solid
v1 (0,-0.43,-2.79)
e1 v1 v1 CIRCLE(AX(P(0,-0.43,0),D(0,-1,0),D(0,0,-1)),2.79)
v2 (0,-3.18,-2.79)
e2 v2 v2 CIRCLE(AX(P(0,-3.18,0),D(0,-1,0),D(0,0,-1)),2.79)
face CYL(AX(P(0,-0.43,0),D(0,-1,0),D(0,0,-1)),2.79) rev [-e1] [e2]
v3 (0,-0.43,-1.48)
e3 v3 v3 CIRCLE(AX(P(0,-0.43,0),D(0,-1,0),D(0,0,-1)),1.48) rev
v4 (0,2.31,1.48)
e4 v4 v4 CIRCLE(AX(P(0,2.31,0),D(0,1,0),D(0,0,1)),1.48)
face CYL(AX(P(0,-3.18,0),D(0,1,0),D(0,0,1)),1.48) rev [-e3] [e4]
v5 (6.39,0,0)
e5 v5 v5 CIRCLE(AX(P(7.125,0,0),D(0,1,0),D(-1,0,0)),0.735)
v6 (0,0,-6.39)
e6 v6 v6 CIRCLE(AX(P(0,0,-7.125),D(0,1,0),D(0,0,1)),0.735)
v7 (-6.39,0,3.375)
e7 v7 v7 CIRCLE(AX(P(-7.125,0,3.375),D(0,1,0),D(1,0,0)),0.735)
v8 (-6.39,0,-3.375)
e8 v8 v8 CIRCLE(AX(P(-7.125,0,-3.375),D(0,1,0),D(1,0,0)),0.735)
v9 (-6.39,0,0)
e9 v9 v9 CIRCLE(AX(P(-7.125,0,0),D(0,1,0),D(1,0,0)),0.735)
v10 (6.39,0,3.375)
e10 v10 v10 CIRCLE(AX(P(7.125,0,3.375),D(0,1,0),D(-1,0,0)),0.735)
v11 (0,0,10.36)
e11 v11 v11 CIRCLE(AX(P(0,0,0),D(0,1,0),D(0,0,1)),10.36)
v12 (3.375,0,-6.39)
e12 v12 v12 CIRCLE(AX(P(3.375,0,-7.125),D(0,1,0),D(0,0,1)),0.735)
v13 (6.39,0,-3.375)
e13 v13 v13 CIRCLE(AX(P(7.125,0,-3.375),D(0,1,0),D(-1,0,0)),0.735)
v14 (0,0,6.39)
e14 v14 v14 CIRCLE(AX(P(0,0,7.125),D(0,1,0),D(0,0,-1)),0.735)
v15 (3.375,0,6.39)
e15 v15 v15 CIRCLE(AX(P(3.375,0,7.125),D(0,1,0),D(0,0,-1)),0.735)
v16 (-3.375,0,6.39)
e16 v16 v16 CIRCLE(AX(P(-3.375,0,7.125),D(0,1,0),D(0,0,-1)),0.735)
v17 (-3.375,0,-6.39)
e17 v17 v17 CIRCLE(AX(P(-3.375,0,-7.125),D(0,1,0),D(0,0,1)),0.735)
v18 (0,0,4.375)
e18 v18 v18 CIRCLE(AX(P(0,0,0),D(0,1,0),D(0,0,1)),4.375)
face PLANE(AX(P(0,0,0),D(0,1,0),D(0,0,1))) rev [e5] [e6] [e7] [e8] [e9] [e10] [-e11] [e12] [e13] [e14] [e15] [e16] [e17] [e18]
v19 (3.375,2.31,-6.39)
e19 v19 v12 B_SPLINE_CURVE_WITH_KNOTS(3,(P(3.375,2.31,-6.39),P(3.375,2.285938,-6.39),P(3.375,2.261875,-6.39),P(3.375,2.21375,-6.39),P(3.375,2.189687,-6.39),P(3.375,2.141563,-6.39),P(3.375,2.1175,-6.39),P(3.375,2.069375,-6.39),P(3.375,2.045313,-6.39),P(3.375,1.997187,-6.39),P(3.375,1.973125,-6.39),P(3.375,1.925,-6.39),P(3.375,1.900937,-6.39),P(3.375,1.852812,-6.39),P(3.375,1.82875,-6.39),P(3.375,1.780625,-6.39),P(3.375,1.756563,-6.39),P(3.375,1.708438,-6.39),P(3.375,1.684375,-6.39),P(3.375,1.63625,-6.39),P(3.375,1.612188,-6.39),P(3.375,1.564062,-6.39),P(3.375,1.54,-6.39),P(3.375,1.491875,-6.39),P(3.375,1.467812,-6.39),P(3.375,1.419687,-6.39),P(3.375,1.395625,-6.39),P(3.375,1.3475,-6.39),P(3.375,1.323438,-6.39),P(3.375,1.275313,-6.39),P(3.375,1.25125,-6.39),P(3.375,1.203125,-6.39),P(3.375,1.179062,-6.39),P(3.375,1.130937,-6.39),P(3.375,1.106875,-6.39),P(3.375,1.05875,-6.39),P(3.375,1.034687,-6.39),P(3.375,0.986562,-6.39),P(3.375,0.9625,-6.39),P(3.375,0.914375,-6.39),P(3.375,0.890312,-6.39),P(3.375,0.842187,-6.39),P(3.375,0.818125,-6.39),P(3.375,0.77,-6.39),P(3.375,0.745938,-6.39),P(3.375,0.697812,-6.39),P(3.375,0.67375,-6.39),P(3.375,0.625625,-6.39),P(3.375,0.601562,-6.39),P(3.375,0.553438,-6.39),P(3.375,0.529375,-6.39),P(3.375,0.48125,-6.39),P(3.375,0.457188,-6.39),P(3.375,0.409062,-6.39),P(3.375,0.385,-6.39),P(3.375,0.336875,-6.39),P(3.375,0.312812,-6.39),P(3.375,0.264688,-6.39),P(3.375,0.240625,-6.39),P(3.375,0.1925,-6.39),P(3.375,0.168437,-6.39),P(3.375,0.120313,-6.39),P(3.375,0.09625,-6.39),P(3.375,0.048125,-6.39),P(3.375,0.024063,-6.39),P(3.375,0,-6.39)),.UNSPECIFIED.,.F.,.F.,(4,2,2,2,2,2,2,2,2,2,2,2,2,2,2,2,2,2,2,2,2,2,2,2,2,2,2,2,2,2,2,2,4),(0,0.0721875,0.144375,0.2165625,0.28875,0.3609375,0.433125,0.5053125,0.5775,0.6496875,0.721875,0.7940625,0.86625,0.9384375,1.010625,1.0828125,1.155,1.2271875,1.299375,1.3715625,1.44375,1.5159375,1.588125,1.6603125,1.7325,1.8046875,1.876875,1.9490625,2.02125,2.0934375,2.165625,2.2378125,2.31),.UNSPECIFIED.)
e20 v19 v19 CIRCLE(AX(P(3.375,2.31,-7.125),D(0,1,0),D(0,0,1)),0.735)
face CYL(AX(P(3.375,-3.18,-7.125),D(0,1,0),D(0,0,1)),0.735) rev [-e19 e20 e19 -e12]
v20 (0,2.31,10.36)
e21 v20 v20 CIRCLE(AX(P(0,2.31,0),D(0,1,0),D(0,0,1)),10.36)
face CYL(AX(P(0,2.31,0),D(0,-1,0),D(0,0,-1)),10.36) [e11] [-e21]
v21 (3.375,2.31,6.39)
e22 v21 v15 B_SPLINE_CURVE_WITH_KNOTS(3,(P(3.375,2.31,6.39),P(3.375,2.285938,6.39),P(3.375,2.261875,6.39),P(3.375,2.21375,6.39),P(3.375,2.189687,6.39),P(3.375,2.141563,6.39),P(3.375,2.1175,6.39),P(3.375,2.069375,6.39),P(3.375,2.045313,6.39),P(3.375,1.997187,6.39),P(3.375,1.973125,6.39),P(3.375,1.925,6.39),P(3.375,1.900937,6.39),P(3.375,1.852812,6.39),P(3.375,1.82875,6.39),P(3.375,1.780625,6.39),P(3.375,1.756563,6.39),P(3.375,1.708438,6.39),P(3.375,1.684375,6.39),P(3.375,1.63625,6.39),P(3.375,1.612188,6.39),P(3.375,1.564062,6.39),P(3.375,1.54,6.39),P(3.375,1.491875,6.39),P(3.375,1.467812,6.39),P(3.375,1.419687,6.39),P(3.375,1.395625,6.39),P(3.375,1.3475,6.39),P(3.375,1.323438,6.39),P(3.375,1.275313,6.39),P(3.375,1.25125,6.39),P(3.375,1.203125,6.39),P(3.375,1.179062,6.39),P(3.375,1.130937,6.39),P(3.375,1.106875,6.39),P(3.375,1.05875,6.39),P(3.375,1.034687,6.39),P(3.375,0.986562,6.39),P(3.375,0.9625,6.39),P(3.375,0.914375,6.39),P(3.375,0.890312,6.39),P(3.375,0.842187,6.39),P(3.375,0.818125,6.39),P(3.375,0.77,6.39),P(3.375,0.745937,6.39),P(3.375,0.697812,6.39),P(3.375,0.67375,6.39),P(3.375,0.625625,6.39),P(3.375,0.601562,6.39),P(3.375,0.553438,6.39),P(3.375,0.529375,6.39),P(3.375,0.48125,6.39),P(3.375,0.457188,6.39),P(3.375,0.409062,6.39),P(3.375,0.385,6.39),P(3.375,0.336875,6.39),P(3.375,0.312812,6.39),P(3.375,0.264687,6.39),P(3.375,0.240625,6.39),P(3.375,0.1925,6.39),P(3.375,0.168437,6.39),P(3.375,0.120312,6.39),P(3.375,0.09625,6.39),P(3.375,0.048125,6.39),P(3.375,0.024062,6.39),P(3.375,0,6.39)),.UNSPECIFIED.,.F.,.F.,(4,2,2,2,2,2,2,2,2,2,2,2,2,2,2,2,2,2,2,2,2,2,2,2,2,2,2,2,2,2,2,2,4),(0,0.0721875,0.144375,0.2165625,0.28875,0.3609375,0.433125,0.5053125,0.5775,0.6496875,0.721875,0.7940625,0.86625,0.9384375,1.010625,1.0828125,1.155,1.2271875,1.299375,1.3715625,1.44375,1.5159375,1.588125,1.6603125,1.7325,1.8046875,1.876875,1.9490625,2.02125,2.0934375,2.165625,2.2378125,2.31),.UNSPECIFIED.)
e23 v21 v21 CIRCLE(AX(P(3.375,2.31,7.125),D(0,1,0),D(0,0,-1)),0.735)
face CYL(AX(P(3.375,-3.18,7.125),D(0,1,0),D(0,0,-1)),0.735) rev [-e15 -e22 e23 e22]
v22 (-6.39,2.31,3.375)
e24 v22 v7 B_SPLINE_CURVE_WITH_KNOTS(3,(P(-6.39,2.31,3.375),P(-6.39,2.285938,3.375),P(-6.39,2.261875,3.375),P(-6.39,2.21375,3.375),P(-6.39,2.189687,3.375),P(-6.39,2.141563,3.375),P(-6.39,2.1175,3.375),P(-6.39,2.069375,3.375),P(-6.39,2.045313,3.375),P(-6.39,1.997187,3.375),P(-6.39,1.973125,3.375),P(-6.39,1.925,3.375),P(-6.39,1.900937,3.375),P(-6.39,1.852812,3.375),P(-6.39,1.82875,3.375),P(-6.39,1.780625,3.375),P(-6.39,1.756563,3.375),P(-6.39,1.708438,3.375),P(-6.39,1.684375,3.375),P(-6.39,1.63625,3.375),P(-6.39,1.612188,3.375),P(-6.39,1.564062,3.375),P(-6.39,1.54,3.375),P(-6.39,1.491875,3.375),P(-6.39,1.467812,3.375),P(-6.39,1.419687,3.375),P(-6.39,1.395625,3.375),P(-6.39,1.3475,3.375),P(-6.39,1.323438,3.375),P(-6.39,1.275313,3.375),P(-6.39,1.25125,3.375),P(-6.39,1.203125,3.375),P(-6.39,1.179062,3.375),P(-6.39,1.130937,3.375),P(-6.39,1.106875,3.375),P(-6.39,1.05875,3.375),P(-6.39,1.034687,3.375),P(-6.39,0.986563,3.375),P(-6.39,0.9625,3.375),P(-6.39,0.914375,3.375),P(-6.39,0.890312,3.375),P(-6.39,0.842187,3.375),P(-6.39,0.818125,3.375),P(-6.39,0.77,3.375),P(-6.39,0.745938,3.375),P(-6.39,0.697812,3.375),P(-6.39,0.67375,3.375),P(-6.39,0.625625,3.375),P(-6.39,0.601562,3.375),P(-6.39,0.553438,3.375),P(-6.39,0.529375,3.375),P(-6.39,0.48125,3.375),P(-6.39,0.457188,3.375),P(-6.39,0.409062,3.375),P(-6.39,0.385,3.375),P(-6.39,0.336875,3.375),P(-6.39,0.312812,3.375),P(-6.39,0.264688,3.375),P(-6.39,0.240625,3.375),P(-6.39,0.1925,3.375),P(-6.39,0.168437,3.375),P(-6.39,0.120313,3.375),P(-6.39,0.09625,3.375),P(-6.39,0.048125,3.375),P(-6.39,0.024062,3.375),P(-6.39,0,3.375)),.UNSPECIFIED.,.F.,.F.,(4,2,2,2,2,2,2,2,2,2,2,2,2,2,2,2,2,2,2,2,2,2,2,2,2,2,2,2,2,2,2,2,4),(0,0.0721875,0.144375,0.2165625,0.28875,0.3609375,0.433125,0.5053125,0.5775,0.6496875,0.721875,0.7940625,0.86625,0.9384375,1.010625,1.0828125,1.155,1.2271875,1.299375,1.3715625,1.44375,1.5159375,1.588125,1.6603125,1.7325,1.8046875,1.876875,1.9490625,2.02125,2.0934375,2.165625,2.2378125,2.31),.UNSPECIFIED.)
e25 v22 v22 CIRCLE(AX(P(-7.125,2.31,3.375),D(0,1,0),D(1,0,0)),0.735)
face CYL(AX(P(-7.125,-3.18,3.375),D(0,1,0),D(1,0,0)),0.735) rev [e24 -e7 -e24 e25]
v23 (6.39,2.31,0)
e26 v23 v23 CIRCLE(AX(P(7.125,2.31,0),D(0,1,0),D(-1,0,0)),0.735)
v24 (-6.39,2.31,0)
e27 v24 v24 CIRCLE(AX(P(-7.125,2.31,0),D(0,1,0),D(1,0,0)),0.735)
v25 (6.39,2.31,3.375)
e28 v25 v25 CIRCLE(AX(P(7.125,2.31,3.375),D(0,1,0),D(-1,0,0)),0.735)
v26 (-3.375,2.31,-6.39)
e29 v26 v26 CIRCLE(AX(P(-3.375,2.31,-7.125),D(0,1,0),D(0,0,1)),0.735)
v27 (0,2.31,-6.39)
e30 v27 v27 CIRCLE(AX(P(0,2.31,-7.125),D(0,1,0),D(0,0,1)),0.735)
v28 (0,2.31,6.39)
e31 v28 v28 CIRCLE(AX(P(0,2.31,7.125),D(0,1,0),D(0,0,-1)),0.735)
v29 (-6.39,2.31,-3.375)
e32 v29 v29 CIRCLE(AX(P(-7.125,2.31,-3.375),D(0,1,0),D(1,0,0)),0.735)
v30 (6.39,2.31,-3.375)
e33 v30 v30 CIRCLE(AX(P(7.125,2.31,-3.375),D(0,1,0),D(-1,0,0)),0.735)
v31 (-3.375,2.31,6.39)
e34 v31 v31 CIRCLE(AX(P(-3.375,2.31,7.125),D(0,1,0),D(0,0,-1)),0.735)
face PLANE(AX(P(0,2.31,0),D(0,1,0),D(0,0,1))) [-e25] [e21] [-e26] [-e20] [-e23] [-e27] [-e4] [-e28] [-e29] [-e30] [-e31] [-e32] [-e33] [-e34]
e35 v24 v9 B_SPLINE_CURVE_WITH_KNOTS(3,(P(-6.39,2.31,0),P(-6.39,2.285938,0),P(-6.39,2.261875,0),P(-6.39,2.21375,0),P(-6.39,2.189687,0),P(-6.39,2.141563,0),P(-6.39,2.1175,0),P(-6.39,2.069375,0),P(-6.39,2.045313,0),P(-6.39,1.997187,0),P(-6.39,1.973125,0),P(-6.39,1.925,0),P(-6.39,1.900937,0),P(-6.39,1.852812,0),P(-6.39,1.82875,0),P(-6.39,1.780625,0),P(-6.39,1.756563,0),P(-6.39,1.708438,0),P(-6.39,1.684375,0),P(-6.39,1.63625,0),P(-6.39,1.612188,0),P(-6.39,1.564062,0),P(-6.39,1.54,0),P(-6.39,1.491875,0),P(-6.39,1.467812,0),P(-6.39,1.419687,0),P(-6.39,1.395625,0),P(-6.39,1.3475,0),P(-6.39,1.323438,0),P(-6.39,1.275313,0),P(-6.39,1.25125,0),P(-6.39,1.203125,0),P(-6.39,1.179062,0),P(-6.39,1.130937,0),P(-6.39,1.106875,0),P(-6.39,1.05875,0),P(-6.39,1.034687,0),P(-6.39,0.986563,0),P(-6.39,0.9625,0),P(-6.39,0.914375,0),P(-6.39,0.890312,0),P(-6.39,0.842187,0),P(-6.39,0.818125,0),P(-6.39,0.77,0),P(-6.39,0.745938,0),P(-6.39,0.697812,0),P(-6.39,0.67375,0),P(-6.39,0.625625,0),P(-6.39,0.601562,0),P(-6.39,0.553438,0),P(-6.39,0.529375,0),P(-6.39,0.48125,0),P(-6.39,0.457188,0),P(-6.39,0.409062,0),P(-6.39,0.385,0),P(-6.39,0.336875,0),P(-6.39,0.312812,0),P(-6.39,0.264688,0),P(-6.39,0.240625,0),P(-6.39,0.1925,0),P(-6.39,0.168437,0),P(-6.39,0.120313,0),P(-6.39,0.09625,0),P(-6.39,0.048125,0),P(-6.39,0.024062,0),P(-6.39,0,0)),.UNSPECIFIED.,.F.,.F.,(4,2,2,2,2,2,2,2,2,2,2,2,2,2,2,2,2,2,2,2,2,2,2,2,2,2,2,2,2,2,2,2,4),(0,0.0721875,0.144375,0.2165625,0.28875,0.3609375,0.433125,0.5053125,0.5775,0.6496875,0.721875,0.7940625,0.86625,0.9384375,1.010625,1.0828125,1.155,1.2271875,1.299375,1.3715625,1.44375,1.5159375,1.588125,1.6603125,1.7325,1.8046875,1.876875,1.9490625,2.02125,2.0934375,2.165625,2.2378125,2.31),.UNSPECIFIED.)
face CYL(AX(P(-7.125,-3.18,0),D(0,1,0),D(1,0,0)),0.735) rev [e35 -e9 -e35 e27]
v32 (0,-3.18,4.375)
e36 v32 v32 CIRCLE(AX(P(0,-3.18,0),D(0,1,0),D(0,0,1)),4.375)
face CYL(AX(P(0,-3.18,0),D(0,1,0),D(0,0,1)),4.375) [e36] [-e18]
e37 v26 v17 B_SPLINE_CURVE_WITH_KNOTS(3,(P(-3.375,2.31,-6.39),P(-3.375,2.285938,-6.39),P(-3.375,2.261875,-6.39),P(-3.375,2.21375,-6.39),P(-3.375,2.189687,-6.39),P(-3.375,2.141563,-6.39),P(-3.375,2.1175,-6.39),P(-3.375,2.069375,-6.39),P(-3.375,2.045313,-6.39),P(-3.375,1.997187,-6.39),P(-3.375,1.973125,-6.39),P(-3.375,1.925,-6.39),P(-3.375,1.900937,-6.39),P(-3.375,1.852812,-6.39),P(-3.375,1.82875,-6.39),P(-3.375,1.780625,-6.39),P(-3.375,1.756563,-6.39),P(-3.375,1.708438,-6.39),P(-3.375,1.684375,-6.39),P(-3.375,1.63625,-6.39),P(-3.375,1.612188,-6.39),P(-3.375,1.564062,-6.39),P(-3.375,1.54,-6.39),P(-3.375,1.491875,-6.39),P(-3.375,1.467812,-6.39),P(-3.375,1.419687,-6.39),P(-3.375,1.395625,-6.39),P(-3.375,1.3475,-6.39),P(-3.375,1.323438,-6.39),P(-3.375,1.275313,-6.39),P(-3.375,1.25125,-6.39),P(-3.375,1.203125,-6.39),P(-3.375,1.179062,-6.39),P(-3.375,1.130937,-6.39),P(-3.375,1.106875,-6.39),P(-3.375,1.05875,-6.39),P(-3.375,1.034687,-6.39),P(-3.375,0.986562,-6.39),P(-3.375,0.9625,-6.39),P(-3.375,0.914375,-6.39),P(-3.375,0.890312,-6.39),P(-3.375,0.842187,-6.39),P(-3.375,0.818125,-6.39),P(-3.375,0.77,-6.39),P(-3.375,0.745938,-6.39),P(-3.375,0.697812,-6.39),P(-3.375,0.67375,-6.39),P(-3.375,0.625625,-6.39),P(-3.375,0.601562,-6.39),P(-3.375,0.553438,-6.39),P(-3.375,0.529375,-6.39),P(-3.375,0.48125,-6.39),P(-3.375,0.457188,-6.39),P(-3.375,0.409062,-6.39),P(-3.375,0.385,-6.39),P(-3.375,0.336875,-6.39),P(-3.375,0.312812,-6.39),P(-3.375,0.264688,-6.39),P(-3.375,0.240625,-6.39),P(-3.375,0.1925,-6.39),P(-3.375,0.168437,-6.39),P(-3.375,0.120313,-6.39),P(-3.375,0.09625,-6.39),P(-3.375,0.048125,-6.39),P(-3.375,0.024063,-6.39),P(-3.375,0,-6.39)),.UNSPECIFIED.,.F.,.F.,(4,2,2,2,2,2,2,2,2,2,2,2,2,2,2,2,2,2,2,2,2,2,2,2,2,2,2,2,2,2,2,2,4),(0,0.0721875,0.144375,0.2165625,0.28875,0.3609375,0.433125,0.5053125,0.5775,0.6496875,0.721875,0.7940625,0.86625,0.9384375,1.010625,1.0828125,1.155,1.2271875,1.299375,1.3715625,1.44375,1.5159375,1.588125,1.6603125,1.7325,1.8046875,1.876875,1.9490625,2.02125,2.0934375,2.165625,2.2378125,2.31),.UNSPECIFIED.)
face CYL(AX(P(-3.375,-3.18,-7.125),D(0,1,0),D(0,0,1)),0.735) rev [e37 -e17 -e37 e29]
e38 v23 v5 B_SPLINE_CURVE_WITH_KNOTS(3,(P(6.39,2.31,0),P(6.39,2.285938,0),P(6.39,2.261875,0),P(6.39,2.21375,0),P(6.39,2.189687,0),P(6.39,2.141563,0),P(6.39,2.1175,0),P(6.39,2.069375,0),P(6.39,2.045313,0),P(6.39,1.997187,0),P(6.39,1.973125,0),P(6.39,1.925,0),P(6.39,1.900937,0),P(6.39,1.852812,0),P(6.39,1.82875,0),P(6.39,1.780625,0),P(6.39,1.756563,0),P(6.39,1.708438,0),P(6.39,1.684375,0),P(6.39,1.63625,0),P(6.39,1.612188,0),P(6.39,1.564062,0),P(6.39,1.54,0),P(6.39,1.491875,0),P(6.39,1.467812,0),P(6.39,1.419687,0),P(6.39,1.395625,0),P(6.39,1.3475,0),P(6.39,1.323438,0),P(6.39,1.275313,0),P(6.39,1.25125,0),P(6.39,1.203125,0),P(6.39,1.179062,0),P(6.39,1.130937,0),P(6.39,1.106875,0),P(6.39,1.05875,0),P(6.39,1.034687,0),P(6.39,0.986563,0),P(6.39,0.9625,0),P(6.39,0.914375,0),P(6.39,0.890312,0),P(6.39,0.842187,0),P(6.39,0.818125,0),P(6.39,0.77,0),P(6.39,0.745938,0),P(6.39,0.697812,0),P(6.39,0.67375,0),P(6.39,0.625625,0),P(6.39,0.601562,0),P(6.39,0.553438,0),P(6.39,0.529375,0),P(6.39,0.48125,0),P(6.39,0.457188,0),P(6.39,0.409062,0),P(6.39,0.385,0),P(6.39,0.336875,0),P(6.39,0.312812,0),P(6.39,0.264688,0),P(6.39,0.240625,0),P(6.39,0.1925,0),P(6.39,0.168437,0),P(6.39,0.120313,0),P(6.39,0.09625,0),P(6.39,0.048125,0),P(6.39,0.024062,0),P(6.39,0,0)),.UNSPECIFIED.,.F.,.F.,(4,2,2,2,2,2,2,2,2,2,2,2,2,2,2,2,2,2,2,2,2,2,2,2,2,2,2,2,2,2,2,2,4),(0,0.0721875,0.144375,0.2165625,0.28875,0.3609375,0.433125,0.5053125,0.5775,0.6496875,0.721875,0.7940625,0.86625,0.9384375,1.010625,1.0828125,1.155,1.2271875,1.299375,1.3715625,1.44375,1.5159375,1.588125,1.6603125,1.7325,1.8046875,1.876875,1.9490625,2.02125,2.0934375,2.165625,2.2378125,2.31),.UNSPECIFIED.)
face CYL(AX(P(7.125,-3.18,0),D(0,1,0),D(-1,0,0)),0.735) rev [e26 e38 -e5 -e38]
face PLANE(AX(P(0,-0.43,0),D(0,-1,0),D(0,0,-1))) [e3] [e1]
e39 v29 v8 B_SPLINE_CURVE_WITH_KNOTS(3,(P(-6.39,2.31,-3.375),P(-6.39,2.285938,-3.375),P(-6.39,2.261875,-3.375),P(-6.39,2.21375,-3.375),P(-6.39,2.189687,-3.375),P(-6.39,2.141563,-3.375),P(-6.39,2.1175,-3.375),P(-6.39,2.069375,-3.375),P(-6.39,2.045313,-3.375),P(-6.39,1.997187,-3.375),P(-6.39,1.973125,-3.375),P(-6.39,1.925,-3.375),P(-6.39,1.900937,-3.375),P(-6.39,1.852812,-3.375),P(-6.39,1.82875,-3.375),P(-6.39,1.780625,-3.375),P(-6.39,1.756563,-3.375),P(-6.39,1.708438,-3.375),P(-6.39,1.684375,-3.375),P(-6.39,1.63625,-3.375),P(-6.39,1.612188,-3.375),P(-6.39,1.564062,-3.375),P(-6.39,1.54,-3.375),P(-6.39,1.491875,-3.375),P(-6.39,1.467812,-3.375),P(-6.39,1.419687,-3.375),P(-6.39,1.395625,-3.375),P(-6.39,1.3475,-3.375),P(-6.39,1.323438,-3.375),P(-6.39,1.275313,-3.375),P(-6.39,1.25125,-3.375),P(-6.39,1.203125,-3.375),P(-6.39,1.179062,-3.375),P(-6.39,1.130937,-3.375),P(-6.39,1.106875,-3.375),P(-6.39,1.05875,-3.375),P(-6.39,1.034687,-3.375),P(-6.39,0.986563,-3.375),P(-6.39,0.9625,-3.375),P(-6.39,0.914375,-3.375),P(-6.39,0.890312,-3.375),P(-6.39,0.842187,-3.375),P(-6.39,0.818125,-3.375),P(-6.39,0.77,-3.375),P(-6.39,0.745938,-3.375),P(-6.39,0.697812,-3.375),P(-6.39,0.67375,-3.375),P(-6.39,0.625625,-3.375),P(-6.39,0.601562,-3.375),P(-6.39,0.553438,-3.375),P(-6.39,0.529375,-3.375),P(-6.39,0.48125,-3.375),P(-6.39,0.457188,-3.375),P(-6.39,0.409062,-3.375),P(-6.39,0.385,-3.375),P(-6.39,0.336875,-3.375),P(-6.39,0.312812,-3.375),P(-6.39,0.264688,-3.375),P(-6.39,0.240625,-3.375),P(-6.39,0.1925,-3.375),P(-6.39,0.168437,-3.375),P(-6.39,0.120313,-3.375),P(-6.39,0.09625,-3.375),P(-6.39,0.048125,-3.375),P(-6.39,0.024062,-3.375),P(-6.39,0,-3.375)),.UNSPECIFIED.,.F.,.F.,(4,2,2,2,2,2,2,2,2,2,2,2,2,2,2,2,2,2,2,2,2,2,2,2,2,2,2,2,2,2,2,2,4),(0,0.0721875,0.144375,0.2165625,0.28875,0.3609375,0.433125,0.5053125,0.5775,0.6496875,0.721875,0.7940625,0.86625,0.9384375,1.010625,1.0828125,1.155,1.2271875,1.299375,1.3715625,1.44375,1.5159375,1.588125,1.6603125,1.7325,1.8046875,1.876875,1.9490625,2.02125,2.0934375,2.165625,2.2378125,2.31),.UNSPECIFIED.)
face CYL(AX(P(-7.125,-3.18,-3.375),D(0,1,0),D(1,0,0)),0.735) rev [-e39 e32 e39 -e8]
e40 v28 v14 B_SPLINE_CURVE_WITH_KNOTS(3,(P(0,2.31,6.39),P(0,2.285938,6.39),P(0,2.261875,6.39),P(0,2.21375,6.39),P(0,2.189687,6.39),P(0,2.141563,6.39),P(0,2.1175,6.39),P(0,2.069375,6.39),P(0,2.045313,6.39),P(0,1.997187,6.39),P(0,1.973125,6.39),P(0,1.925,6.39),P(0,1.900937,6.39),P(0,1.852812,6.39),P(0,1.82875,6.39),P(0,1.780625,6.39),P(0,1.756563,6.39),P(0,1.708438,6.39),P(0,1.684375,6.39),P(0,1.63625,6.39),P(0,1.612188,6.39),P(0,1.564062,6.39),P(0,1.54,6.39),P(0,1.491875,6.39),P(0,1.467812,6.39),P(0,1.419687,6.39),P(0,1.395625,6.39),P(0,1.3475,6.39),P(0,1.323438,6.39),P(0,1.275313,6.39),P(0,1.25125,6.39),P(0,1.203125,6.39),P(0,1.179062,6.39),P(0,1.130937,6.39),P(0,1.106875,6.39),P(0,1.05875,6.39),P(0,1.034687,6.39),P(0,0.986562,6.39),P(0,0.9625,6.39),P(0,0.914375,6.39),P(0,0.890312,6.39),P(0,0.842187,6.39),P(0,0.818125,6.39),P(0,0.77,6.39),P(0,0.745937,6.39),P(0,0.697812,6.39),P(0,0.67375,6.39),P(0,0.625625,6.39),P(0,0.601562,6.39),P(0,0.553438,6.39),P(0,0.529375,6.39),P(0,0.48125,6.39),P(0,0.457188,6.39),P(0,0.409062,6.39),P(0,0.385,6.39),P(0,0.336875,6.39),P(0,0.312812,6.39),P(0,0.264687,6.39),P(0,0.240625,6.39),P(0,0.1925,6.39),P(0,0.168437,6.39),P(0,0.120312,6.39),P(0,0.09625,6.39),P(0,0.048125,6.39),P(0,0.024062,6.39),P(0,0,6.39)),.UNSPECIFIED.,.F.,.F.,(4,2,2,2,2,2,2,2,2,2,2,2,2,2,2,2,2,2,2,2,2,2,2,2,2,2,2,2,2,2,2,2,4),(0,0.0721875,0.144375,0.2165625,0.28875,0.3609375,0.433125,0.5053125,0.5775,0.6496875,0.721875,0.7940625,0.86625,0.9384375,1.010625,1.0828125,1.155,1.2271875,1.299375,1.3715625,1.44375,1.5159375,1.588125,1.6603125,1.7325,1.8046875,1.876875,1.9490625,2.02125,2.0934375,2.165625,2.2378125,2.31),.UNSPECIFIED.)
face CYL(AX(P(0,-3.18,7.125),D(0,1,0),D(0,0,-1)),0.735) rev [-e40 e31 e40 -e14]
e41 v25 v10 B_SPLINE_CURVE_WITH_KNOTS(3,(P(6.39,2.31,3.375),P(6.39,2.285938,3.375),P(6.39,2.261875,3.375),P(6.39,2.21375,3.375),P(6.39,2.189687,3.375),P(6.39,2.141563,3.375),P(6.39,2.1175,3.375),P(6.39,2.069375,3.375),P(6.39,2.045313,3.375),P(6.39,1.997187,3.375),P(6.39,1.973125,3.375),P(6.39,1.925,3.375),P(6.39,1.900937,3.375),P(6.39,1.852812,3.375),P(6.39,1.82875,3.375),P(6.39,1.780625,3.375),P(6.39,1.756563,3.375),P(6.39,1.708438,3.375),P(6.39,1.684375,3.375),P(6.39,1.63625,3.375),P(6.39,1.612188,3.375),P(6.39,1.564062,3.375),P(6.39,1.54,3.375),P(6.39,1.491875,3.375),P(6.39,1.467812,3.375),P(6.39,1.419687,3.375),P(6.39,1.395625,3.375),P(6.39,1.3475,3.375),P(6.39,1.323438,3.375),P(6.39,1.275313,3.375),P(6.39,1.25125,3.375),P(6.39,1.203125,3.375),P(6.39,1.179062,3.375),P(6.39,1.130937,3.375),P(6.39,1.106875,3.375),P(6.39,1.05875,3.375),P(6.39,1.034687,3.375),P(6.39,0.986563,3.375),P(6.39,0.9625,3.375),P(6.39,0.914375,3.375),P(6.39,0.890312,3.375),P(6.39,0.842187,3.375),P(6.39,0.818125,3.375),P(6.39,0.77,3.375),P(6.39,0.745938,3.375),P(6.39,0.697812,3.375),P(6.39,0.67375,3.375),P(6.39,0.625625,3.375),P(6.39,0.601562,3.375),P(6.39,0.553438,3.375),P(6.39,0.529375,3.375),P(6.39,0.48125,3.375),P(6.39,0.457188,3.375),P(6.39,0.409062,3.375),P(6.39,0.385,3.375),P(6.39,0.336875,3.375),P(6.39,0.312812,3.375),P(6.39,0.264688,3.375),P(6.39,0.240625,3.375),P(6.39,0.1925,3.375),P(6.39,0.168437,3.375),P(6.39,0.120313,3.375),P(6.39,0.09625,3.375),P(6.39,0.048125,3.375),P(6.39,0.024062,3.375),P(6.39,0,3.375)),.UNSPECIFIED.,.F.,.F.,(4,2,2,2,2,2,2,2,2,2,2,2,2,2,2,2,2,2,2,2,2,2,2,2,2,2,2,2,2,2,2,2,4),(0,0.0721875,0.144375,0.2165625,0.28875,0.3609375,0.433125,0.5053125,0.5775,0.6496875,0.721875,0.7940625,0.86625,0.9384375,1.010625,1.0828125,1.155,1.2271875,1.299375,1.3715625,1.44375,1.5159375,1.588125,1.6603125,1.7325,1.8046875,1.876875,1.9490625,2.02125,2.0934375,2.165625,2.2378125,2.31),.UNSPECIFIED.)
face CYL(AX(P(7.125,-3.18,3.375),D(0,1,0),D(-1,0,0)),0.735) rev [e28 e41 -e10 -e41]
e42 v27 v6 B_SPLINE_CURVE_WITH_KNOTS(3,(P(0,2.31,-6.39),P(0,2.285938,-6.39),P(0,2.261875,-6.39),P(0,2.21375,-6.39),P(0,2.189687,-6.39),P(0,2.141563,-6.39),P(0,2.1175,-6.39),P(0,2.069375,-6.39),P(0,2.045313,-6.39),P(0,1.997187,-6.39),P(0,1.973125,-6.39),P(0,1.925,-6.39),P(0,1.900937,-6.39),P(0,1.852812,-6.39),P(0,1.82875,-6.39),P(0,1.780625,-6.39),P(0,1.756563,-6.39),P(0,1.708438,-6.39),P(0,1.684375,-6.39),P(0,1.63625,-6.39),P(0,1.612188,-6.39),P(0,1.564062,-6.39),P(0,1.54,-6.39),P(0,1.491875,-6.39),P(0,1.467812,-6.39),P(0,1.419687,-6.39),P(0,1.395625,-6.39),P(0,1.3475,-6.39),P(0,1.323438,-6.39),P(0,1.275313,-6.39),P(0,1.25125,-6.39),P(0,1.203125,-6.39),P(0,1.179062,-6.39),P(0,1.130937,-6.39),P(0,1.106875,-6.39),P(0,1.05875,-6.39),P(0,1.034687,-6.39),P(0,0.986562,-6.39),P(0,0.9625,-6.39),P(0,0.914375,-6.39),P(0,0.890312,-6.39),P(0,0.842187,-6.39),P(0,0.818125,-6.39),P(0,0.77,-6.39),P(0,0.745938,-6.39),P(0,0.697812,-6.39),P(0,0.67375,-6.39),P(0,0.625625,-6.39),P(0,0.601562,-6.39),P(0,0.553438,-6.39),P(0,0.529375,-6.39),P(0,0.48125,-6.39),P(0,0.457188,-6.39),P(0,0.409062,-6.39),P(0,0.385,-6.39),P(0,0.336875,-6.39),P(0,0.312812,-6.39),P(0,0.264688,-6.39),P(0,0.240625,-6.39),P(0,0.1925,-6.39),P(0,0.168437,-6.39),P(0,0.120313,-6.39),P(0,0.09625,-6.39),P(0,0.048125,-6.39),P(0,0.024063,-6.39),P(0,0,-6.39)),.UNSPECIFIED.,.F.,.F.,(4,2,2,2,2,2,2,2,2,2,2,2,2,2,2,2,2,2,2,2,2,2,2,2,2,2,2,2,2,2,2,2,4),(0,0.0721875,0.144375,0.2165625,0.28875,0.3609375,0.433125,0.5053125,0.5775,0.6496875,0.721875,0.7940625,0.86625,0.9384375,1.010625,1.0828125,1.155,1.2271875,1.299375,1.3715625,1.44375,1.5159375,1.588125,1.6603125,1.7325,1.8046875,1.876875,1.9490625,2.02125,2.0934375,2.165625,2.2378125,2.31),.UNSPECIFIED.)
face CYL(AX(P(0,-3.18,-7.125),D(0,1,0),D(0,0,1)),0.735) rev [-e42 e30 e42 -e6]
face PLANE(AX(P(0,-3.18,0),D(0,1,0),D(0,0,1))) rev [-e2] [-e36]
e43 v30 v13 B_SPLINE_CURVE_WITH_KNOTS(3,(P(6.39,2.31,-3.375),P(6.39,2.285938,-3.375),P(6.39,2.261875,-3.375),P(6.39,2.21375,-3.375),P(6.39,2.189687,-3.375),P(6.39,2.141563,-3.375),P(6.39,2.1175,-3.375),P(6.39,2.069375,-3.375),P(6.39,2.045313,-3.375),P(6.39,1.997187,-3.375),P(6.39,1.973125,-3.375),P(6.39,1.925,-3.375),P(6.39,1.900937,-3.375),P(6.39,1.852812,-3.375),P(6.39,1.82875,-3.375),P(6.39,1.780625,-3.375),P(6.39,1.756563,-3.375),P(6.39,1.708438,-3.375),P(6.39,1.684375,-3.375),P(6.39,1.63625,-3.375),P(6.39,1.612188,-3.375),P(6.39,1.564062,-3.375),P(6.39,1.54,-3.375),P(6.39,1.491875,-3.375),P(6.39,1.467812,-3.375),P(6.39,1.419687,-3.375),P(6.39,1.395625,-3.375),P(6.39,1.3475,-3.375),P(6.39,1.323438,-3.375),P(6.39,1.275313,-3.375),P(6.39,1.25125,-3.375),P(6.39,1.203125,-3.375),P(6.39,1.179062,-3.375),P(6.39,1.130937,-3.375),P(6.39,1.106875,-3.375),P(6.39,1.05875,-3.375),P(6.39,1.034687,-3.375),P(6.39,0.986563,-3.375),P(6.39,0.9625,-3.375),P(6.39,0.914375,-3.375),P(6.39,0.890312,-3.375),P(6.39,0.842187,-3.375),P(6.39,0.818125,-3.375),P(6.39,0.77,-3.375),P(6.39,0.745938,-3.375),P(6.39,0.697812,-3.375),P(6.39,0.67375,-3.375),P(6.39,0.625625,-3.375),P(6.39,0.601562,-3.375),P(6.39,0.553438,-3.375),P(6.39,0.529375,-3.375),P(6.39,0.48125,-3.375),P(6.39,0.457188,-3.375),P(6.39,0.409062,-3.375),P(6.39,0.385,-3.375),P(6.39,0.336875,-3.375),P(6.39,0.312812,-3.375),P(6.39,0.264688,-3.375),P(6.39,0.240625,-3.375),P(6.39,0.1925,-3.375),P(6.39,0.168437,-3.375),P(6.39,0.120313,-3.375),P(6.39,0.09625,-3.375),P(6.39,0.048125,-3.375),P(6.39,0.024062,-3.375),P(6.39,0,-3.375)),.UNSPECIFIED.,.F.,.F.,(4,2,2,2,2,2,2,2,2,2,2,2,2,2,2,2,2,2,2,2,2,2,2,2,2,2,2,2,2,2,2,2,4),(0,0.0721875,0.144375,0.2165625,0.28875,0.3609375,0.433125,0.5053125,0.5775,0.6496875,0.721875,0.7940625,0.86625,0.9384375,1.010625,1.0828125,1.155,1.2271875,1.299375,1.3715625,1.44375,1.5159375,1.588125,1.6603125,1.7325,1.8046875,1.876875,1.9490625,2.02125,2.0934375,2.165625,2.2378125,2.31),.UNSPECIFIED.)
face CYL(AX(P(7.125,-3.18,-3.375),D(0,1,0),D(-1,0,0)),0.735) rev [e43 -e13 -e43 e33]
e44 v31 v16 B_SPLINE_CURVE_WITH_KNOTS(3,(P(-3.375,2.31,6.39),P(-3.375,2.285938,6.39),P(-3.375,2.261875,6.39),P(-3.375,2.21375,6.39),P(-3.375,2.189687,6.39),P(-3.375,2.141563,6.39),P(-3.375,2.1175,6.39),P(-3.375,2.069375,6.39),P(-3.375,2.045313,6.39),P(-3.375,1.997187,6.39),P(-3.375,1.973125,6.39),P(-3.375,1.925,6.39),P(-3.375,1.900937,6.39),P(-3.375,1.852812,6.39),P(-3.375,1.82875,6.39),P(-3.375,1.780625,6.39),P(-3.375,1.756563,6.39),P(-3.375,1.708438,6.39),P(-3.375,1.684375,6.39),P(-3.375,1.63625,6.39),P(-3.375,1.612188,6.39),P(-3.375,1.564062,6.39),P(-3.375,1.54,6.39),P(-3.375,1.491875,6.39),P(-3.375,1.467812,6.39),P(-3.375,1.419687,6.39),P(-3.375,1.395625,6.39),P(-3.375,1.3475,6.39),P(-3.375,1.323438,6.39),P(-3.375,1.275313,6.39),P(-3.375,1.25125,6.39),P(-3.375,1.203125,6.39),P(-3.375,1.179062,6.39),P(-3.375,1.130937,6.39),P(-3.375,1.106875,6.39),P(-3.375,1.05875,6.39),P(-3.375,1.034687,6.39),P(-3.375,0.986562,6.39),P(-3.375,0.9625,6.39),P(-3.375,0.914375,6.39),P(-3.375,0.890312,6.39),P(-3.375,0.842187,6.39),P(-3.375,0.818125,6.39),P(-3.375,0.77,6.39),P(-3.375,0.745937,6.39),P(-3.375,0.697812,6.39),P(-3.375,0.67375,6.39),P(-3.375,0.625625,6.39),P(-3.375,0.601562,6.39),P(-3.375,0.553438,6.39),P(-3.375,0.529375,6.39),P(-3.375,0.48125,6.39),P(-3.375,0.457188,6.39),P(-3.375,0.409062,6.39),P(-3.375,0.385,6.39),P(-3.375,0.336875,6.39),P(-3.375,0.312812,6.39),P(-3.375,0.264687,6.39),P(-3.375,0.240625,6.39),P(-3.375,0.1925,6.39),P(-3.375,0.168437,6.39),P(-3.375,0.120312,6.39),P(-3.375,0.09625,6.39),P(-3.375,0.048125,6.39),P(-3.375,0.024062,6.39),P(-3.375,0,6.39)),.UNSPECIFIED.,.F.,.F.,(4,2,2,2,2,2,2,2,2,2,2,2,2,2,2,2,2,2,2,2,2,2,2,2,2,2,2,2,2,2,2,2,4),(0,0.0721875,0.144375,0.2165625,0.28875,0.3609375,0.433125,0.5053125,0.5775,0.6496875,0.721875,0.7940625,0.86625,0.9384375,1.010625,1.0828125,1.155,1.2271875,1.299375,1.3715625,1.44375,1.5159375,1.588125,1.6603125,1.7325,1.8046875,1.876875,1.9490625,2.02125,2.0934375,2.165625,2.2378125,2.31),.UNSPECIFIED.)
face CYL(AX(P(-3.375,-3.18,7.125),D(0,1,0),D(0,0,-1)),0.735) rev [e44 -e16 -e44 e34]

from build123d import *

# Parameters (mm, degrees)
SKETCH1_R               = 10.36
BOSS_EXTRUDE1_DEPTH     = 2.31
BOSS_EXTRUDE2_START     = -2.31
SKETCH2_R               = 4.375
BOSS_EXTRUDE2_DEPTH     = 5.49
CUT_EXTRUDE1_DEPTH      = 16.646063403
CUT_EXTRUDE1_DEPTH_BACK = 16.646063403
SKETCH5_R               = 1.48
SKETCH6_R               = 2.79
CUT_EXTRUDE2_DEPTH      = 2.75
SKETCH7_R               = 0.735
CUT_EXTRUDE3_DEPTH      = 15.992384734
CRVPATTERN2_OUTLINE_R   = 0.735
CRVPATTERN2_DEPTH       = 2.31
CIRPATTERN1_COUNT       = 4


# Read off the part's stored shape, not the designer's step: CrvPattern2
with BuildPart() as part:
    # Sketch1 → Boss-Extrude1 (new body)
    with BuildSketch(Plane(origin=(0, 0, 0), x_dir=(1, 0, 0), z_dir=(0, 1, 0))):
        with Locations(Location((0, 0, 0), (0, 0, 270))):
            Circle(SKETCH1_R)
    extrude(amount=BOSS_EXTRUDE1_DEPTH)

    # Sketch2 → Boss-Extrude2 (add)
    with BuildSketch(Plane(origin=(0, 0, 0), x_dir=(-1, 0, 0), z_dir=(0, -1, 0)).offset(BOSS_EXTRUDE2_START)):
        with Locations(Location((0, 0, 0), (0, 0, 270))):
            Circle(SKETCH2_R)
    extrude(amount=BOSS_EXTRUDE2_DEPTH)

    # Sketch5 → Cut-Extrude1 (cut, two sides: drawn at the far end of the back side and taken through both)
    with BuildSketch(Plane(origin=(0, 2.31, 0), x_dir=(1, 0, 0), z_dir=(0, 1, 0)).offset(-CUT_EXTRUDE1_DEPTH_BACK)):
        with Locations(Location((0, 0, 0), (0, 0, 270))):
            Circle(SKETCH5_R)
    extrude(amount=CUT_EXTRUDE1_DEPTH + CUT_EXTRUDE1_DEPTH_BACK, mode=Mode.SUBTRACT)

    # Sketch6 → Cut-Extrude2 (cut)
    with BuildSketch(Plane.XZ.offset(3.18)):
        with Locations(Location((0, 0, 0), (0, 0, 270))):
            Circle(SKETCH6_R)
    extrude(amount=-CUT_EXTRUDE2_DEPTH, mode=Mode.SUBTRACT)

    # Sketch7 → Cut-Extrude3 (cut, symmetric)
    with BuildSketch(Plane(origin=(0, 0, 0), x_dir=(1, 0, 0), z_dir=(0, 1, 0))):
        with Locations(Location((-3.375, 7.125, 0), (0, 0, 270))):
            Circle(SKETCH7_R)
    cut_extrude3 = extrude(amount=CUT_EXTRUDE3_DEPTH, both=True, mode=Mode.SUBTRACT)

    # CrvPattern2 outline → CrvPattern2 (cut)
    with BuildSketch(Plane(origin=(0, 0, 0), x_dir=(1, 0, 0), z_dir=(0, 1, 0))):
        with Locations((3.375, 7.125)):
            Circle(CRVPATTERN2_OUTLINE_R)
        with Locations((0, 7.125)):
            Circle(CRVPATTERN2_OUTLINE_R)
    crvpattern2 = extrude(amount=CRVPATTERN2_DEPTH, mode=Mode.SUBTRACT)

    # CirPattern1: Cut-Extrude3, CrvPattern2 ×4 about axis
    cirpattern1_axis = Axis((0, 0, 0), (0, 1, 0))
    add([cut_extrude3.rotate(cirpattern1_axis, i * 360 / CIRPATTERN1_COUNT) for i in range(1, CIRPATTERN1_COUNT)], mode=Mode.SUBTRACT)
    add([crvpattern2.rotate(cirpattern1_axis, i * 360 / CIRPATTERN1_COUNT) for i in range(1, CIRPATTERN1_COUNT)], mode=Mode.SUBTRACT)


solid = part.part
